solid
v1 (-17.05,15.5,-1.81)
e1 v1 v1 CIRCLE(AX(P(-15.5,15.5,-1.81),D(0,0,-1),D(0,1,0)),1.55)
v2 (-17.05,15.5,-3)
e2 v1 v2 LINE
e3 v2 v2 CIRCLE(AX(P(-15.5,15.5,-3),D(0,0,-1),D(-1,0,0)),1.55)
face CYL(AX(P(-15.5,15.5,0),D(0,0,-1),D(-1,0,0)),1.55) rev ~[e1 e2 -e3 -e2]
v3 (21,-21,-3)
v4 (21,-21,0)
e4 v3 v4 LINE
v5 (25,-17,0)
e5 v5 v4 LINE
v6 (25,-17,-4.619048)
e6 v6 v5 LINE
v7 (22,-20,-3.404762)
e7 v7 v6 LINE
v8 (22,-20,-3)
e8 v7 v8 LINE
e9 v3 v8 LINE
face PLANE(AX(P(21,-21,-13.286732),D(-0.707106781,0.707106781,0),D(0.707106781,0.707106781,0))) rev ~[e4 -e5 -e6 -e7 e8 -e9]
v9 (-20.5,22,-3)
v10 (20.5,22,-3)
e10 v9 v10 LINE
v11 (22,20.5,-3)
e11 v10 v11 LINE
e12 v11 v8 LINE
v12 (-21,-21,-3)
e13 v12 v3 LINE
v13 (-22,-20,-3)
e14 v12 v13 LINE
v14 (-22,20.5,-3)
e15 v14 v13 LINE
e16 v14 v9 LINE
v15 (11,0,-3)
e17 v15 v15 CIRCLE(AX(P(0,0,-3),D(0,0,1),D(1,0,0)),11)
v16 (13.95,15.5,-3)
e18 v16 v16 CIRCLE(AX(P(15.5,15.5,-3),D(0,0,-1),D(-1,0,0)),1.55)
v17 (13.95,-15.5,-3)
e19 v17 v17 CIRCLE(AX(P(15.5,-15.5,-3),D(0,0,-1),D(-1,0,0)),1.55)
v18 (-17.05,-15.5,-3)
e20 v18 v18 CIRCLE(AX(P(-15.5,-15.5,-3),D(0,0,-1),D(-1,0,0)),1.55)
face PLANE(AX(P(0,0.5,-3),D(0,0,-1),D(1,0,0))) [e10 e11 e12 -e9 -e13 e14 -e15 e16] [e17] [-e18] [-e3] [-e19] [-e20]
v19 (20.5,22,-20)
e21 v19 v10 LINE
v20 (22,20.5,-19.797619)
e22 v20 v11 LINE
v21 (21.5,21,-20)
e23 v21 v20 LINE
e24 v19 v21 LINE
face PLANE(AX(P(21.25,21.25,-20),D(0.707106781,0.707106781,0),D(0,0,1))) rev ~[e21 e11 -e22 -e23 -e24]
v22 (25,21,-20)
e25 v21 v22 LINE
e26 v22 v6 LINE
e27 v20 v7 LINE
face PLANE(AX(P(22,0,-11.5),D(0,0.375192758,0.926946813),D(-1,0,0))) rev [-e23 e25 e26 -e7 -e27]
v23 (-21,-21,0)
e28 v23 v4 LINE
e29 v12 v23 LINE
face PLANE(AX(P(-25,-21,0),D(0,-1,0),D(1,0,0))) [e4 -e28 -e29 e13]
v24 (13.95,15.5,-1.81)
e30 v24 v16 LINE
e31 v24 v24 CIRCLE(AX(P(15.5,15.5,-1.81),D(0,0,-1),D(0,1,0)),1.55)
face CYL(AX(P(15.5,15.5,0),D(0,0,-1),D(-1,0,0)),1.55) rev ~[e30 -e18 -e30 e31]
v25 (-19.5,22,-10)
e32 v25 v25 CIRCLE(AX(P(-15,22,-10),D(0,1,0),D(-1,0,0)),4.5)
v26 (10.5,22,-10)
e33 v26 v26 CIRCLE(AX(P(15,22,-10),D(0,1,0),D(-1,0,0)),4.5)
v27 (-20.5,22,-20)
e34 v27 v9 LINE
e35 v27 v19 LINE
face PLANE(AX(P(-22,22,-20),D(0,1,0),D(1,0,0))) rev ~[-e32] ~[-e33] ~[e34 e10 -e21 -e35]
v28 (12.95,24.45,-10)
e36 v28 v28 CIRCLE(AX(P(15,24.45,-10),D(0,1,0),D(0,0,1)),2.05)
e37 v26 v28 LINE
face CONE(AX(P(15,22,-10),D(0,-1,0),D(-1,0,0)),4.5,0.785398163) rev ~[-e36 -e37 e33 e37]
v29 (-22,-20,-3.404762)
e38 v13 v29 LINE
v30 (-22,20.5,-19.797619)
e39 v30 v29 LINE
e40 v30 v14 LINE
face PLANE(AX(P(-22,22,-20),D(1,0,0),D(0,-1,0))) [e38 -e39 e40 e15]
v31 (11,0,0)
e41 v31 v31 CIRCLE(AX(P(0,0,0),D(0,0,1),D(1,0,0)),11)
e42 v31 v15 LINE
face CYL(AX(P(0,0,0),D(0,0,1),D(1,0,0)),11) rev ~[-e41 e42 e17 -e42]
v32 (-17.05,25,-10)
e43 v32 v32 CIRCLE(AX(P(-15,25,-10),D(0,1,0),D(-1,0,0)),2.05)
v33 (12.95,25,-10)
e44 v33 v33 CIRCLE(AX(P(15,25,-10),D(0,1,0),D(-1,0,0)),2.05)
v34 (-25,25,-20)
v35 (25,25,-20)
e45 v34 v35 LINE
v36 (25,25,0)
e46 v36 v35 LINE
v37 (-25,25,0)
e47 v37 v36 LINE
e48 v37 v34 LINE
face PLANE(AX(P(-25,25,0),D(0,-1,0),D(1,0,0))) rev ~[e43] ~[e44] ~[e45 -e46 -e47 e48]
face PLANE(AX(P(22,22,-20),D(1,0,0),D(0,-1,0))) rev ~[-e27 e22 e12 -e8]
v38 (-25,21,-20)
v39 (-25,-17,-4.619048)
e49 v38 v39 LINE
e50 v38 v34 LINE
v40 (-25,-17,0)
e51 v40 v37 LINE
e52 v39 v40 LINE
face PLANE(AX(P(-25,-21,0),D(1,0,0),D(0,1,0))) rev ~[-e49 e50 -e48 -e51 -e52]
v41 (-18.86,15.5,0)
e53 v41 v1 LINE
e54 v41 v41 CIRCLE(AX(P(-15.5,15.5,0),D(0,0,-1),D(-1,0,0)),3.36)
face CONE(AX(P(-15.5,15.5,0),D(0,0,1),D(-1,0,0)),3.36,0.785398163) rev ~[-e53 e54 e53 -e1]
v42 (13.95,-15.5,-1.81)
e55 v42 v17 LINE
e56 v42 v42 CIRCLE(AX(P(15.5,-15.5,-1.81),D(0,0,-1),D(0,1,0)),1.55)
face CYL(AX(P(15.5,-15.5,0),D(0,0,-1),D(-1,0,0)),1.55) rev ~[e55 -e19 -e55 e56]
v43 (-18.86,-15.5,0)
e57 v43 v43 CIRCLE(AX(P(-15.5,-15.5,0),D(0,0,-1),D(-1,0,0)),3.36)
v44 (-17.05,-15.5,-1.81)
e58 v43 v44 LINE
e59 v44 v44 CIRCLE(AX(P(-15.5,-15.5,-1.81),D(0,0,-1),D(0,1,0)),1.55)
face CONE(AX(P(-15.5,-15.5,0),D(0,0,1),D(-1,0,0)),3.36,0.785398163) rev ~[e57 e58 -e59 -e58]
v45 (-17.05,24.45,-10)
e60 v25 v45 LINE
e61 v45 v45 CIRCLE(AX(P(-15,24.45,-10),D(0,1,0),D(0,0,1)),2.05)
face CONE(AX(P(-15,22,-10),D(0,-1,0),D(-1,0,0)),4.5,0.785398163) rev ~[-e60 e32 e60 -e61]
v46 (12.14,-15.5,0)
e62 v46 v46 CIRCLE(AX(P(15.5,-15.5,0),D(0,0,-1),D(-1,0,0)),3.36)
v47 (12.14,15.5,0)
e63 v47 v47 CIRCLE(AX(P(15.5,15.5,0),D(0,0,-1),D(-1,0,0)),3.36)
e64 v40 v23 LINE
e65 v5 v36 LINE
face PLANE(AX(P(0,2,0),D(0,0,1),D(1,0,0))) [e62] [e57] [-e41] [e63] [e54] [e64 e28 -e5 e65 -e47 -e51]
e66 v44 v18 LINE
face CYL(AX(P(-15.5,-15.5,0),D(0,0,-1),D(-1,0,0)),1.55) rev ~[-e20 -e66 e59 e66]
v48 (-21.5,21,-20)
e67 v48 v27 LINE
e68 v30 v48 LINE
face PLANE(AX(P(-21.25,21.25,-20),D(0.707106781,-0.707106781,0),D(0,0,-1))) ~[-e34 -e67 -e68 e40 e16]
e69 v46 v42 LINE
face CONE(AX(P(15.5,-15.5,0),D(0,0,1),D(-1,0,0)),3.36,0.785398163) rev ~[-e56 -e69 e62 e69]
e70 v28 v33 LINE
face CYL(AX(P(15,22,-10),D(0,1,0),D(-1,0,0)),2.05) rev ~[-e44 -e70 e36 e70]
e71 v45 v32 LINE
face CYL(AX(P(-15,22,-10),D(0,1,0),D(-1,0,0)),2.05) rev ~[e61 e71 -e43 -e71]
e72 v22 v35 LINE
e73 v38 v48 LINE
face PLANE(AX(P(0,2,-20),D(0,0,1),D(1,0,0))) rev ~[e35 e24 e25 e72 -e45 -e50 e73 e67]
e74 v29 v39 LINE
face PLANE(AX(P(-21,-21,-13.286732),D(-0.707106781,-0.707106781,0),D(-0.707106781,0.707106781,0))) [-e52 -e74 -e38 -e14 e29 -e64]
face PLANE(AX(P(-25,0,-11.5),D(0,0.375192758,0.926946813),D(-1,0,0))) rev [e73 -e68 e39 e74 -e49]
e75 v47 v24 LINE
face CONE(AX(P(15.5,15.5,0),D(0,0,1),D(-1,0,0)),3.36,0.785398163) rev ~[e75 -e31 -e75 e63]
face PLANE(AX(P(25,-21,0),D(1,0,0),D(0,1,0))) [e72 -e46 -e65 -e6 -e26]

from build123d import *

# Parameters (mm, degrees)
F0_W           = 50
F0_H           = 46
F0_R           = 11
F1_DEPTH       = 20
F2_W           = 44
F2_H           = 43
F3_DEPTH       = 17
F4_SIZE2       = 17
F4_SIZE        = 42
F5_D           = 3.1
F5_CSINK_D     = 6.72
F5_CSINK_ANGLE = 90
F6_T1_DEPTH    = 23.5734639037
F7_SIZE        = 1.5
F9_D           = 4.1
F9_CSINK_D     = 9
F9_CSINK_ANGLE = 90


# Not quite as in the source:
# - a fillet or chamfer that OpenCascade refuses, or shapes differently, is made with other operations: its cross-section is extruded or revolved along the edge and cut away or added


with BuildPart() as f1:
    # F0 (on Top) → F1 (new body)
    with BuildSketch(Plane.XY):
        with Locations((0, 2)):
            Rectangle(F0_W, F0_H)
        Circle(F0_R, mode=Mode.SUBTRACT)
    extrude(amount=-F1_DEPTH)

    # F2 (on face) → F3 (cut, through all)
    with BuildSketch(Plane(origin=(0, 0, -20), x_dir=(1, 0, 0), z_dir=(0, 0, -1))):
        with Locations((0, -0.5)):
            Rectangle(F2_W, F2_H)
    extrude(amount=-F3_DEPTH, mode=Mode.SUBTRACT)

    # F4
    f4_edges = [f1.edges().sort_by_distance(p)[0] for p in [
        (23.5, -21, -20),
        (-23.5, -21, -20),
    ]]
    f4_side = f1.faces().sort_by_distance((-24.320588, 2, -20))[0]
    chamfer(f4_edges, length=F4_SIZE, length2=F4_SIZE2, reference=f4_side)

    # F5 (through all)
    with Locations(Plane.XY):
        with Locations((15.5, 15.5), (-15.5, 15.5), (-15.5, -15.5), (15.5, -15.5)):
            CounterSinkHole(F5_D / 2, F5_CSINK_D / 2, counter_sink_angle=F5_CSINK_ANGLE)

    # F6: chamfer of 4 on 2 edges, made by hand

    # F6_s2 → F6_t1 (cut)
    with BuildSketch(Plane.XY.offset(-13.2867319519)):
        Polygon((-21, -21), (-25, -17), (-25, -21), align=None)
        Polygon((21, -21), (25, -17), (25, -21), align=None)
    extrude(amount=F6_T1_DEPTH, mode=Mode.SUBTRACT)

    # F7
    f7_edges = [f1.edges().sort_by_distance(p)[0] for p in [
        (-22, 22, -11.5),
        (22, 22, -11.5),
    ]]
    chamfer(f7_edges, length=F7_SIZE)

    # F9 (through all)
    with Locations(Plane.XZ.offset(-22)):
        with Locations((15, -10), (-15, -10)):
            CounterSinkHole(F9_D / 2, F9_CSINK_D / 2, counter_sink_angle=F9_CSINK_ANGLE)


solid = f1.part
